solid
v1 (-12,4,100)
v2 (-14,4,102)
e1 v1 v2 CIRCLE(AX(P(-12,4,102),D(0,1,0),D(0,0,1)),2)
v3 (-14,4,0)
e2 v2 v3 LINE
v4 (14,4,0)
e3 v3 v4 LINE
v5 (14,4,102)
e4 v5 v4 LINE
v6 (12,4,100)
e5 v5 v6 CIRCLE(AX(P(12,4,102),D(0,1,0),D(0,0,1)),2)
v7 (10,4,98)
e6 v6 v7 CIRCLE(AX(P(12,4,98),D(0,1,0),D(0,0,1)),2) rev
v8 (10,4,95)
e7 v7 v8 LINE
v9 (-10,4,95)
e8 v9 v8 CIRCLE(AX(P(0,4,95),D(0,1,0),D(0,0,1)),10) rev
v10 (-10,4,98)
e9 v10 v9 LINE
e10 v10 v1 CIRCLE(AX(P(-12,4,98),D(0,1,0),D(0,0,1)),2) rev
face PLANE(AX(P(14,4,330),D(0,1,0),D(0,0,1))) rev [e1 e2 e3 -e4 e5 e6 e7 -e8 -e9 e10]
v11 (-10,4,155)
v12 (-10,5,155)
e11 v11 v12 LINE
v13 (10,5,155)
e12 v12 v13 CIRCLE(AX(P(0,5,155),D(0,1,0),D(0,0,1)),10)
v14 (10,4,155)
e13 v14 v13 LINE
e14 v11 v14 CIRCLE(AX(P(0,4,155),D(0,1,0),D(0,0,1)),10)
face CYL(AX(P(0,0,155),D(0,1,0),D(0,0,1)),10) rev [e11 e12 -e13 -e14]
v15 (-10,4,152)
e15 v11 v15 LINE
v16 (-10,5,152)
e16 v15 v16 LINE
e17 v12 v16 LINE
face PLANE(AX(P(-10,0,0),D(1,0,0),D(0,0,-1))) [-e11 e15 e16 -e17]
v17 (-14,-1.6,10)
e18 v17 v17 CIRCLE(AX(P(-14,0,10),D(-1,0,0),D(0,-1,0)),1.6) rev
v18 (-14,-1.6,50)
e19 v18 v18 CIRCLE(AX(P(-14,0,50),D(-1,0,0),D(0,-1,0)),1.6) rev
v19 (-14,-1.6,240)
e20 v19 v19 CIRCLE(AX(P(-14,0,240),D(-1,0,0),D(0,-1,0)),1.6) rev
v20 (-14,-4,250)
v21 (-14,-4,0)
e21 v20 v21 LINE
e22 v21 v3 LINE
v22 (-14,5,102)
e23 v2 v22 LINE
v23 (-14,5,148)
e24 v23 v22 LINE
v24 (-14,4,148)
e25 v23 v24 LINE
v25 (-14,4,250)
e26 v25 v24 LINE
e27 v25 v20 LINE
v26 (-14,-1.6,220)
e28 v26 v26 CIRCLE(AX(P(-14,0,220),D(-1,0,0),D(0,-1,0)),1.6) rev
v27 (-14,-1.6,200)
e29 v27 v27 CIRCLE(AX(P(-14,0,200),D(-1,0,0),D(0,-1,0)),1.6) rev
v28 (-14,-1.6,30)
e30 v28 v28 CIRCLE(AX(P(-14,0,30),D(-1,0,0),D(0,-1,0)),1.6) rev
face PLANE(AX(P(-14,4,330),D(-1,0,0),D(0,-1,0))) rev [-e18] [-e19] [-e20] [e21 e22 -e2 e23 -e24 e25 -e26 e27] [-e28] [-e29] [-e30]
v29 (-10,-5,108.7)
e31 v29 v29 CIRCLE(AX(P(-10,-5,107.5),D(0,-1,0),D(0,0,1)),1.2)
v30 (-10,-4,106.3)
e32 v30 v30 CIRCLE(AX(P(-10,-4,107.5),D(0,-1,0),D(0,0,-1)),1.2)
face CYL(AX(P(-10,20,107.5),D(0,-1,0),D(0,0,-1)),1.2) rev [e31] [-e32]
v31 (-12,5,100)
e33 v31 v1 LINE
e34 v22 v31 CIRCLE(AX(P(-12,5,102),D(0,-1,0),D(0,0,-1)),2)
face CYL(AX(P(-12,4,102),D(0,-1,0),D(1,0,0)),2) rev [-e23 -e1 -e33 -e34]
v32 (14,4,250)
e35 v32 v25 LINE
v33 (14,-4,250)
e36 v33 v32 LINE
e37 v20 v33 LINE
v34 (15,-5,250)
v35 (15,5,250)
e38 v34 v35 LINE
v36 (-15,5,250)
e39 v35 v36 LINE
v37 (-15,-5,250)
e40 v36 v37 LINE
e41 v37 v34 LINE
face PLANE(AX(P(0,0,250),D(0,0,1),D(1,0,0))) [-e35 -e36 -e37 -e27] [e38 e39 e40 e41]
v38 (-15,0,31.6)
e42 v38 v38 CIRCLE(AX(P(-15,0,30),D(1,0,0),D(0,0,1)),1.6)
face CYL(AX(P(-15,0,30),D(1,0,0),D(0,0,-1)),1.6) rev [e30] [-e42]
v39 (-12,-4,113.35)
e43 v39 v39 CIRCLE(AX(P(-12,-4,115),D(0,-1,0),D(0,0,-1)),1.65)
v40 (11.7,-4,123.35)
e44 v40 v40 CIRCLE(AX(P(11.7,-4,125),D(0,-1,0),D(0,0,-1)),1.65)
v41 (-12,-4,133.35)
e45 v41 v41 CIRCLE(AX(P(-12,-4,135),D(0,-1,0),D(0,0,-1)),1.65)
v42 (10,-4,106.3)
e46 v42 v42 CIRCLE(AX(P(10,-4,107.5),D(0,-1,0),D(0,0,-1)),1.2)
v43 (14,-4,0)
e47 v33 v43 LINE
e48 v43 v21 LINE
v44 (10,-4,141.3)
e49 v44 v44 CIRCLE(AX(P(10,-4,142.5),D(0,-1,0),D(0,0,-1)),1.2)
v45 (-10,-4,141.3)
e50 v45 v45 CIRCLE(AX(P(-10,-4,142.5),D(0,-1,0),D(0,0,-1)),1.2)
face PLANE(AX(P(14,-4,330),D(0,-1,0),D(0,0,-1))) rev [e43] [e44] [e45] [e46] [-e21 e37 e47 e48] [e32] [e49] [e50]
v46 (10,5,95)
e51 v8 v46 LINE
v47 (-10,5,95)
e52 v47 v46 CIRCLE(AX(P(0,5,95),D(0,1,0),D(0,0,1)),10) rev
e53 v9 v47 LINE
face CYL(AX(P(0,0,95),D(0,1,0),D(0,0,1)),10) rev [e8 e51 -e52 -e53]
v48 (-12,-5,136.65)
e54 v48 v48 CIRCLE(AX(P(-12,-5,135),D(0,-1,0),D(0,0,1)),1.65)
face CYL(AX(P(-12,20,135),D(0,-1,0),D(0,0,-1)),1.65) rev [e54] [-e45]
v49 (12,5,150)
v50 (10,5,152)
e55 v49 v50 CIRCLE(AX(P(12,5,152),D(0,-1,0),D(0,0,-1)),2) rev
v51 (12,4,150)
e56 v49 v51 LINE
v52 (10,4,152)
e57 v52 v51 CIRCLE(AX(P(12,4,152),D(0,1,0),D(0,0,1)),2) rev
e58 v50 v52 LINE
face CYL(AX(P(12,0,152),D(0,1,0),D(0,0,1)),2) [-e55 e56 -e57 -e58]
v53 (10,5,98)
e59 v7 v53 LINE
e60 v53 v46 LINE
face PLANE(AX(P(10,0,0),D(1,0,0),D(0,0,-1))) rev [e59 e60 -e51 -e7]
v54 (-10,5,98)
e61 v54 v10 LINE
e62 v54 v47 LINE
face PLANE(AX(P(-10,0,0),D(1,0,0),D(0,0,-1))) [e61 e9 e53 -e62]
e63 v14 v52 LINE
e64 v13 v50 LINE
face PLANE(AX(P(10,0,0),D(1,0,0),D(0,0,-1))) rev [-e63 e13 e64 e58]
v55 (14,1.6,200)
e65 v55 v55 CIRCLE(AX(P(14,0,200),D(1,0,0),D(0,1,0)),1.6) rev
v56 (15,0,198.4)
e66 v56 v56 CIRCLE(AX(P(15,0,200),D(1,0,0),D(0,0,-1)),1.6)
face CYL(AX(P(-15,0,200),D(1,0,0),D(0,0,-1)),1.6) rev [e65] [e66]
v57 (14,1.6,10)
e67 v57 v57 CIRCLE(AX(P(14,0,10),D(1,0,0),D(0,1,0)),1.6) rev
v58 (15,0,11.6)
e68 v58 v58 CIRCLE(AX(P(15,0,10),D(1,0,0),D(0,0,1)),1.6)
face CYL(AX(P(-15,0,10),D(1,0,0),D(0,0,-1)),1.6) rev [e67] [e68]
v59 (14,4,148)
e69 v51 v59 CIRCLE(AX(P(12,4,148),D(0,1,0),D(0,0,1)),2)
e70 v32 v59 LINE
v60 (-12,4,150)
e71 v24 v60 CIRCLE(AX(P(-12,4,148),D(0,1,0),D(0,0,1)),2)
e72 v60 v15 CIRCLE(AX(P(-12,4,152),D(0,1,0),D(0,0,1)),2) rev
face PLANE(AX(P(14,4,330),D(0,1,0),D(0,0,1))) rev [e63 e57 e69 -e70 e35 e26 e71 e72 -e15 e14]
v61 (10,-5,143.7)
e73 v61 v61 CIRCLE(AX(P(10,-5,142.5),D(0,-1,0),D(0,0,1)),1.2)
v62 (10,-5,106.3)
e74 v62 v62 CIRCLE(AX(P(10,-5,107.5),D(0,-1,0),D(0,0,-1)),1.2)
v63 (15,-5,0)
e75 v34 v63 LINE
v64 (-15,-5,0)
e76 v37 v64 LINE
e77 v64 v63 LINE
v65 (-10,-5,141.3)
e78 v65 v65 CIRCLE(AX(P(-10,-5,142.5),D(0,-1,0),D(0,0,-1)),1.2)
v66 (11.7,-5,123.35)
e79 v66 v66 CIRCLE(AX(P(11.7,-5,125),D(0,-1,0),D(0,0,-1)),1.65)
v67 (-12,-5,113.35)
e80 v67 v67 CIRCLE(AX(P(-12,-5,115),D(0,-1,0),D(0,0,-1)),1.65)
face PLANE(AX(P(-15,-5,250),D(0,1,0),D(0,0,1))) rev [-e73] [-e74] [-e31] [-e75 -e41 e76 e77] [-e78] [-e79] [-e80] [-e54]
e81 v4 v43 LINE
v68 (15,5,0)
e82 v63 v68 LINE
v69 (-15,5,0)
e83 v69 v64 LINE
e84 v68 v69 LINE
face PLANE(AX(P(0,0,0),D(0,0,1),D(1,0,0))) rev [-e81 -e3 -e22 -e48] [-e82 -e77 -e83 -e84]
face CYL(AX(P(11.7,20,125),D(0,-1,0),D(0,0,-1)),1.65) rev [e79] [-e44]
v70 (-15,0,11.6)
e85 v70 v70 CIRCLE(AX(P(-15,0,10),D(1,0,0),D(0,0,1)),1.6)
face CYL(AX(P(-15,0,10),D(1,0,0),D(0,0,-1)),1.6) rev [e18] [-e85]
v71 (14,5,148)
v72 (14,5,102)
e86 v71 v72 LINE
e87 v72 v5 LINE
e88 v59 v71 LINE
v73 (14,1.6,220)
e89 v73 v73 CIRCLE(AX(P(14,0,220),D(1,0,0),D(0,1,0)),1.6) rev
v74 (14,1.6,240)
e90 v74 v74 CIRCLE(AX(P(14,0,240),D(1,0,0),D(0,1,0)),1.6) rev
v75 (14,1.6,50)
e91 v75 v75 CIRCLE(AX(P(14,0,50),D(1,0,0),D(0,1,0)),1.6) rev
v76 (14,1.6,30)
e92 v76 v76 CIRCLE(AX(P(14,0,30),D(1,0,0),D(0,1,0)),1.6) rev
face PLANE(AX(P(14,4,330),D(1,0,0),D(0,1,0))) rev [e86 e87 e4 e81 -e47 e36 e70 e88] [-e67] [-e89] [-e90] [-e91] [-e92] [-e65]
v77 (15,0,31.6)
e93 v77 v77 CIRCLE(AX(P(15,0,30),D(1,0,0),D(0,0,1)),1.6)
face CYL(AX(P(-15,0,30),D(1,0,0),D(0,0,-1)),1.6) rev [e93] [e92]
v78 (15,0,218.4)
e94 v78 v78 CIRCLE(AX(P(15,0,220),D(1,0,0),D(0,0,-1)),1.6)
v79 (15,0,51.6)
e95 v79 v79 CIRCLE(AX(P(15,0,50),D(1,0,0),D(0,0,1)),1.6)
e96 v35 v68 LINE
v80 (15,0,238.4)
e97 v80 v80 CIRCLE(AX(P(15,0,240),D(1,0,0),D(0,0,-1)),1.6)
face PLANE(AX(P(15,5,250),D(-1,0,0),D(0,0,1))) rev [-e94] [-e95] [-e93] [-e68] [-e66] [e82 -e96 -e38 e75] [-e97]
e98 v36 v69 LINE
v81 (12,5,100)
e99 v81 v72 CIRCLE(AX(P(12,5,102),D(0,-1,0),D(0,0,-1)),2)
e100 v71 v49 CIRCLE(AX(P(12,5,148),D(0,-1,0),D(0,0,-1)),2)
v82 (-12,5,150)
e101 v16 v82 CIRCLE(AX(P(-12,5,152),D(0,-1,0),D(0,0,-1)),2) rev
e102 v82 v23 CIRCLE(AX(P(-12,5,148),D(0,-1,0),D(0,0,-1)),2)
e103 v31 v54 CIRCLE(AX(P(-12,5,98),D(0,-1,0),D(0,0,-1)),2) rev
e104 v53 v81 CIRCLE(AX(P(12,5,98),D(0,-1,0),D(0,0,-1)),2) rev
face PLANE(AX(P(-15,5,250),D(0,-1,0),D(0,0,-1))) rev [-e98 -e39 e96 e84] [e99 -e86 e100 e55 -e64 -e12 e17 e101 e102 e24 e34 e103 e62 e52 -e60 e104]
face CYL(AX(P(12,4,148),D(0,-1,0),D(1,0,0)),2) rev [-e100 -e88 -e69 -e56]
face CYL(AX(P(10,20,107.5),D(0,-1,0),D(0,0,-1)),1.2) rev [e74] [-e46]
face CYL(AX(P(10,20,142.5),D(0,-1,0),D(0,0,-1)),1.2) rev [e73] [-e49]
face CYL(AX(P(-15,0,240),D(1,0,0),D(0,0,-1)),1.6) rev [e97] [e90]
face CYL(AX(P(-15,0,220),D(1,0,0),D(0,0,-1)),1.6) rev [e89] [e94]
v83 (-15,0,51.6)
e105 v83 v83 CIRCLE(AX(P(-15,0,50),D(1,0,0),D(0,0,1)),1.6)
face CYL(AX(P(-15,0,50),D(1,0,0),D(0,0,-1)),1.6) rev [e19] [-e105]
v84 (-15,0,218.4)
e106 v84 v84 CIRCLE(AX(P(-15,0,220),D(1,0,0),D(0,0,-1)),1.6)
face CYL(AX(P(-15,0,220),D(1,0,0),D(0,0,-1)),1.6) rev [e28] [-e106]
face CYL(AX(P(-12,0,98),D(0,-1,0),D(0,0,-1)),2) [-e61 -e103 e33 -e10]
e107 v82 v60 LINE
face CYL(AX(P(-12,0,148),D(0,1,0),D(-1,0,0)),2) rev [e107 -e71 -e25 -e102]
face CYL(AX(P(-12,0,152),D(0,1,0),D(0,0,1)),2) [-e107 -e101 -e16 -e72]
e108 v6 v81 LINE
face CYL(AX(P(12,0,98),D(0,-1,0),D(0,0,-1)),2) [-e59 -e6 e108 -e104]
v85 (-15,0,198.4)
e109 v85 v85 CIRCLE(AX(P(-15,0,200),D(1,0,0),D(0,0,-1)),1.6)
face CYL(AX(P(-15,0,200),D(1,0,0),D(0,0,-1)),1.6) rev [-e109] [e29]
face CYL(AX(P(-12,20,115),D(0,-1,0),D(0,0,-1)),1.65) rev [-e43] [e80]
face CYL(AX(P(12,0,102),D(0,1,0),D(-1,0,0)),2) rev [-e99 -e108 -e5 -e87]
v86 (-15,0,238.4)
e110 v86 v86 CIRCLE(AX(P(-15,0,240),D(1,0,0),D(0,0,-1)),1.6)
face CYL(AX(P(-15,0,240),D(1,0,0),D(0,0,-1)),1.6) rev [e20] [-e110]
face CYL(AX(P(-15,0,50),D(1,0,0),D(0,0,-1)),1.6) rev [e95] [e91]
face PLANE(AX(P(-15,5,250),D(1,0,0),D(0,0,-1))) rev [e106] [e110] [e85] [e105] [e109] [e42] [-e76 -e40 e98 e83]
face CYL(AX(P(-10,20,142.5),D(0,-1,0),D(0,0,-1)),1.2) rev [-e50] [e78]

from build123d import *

# Parameters (mm, degrees)
SKETCH_1_W          = 30
SKETCH_1_H          = 10
SKETCH_1_W_2        = 27
SKETCH_1_H_2        = 7
EXTRUDE_1_DEPTH     = 250
SKETCH_2_R          = 1.6
CUT_EXTRUDE_1_DEPTH = 252.843205189
SKETCH_6_W          = 28
SKETCH_6_H          = 8
CUT_EXTRUDE_5_DEPTH = 330
SKETCH_8_W          = 4
SKETCH_8_H          = 25
CUT_EXTRUDE_6_DEPTH = 5
SKETCH_10_R         = 1.65
SKETCH_10_W         = 40
SKETCH_10_H         = 39.7
CUT_EXTRUDE_7_DEPTH = 25
FILLET_1_R          = 2
SKETCH_11_R         = 1.2
CUT_EXTRUDE_8_DEPTH = 25


with BuildPart() as part:
    # 草图1 → 凸台-拉伸1 (new body)
    with BuildSketch(Plane.XY):
        Rectangle(SKETCH_1_W, SKETCH_1_H)
        Rectangle(SKETCH_1_W_2, SKETCH_1_H_2, mode=Mode.SUBTRACT)
    extrude(amount=EXTRUDE_1_DEPTH)

    # 草图2 → 切除-拉伸1 (cut, through all)
    with BuildSketch(Plane(origin=(15, 0, 0), x_dir=(0, 0, -1), z_dir=(1, 0, 0))):
        with Locations((-240, 0)):
            Circle(SKETCH_2_R)
        with Locations((-220, 0)):
            Circle(SKETCH_2_R)
        with Locations((-200, 0)):
            Circle(SKETCH_2_R)
        with Locations((-50, 0)):
            Circle(SKETCH_2_R)
        with Locations((-30, 0)):
            Circle(SKETCH_2_R)
        with Locations((-10, 0)):
            Circle(SKETCH_2_R)
    extrude(amount=-CUT_EXTRUDE_1_DEPTH, mode=Mode.SUBTRACT)

    # 草图6 → 切除-拉伸5 (cut)
    with BuildSketch(Plane(origin=(0, 0, 0), x_dir=(-1, 0, 0), z_dir=(0, 0, -1))):
        Rectangle(SKETCH_6_W, SKETCH_6_H)
    extrude(amount=-CUT_EXTRUDE_5_DEPTH, mode=Mode.SUBTRACT)

    # 草图8 → 切除-拉伸6 (cut)
    with BuildSketch(Plane(origin=(0, 5, 0), x_dir=(1, 0, 0), z_dir=(0, 1, 0))):
        with BuildLine():
            Line((-10, -150), (-10, -155))
            ThreePointArc((-10, -155), (-7.071067812, -162.071067812), (0, -165))
            Line((0, -165), (0, -85))
            ThreePointArc((0, -85), (-7.071067812, -87.928932188), (-10, -95))
            Line((-10, -95), (-10, -100))
            Line((-10, -100), (-10, -125))
            Line((-10, -125), (-10, -150))
        make_face()
        with BuildLine():
            Line((0, -85), (0, -165))
            ThreePointArc((0, -165), (7.071067812, -162.071067812), (10, -155))
            Line((10, -155), (10, -150))
            Line((10, -150), (10, -125))
            Line((10, -125), (10, -100))
            Line((10, -100), (10, -95))
            ThreePointArc((10, -95), (7.071067812, -87.928932188), (0, -85))
        make_face()
        with Locations((12, -112.5)):
            Rectangle(SKETCH_8_W, SKETCH_8_H)
        with Locations((12, -137.5)):
            Rectangle(SKETCH_8_W, SKETCH_8_H)
        with Locations((-12, -112.5)):
            Rectangle(SKETCH_8_W, SKETCH_8_H)
        with Locations((-12, -137.5)):
            Rectangle(SKETCH_8_W, SKETCH_8_H)
    extrude(amount=-CUT_EXTRUDE_6_DEPTH, mode=Mode.SUBTRACT)

    # 草图10 → 切除-拉伸7 (cut)
    # profile 1 of 4: a face of its own
    with BuildSketch(Plane.XZ.offset(5)):
        with Locations(Location((-12, 115, 0), (0, 0, 270))):
            Circle(SKETCH_10_R)
    # profile 2 of 4: a face of its own
    with BuildSketch(Plane.XZ.offset(5)):
        with Locations(Location((-12, 135, 0), (0, 0, 270))):
            Circle(SKETCH_10_R)
    # profile 3 of 4: a face of its own
    with BuildSketch(Plane.XZ.offset(5)):
        with Locations(Location((11.7, 125, 0), (0, 0, 270))):
            Circle(SKETCH_10_R)
    # profile 4 of 4: a face of its own
    with BuildSketch(Plane.XZ.offset(5)):
        with Locations((-84.485896168, 54.669789624)):
            Rectangle(SKETCH_10_W, SKETCH_10_H)
        with Locations((-84.485896168, 42.819789624)):
            Circle(SKETCH_10_R, mode=Mode.SUBTRACT)
        with Locations((-94.485896168, 66.519789624)):
            Circle(SKETCH_10_R, mode=Mode.SUBTRACT)
        with Locations((-74.485896168, 66.519789624)):
            Circle(SKETCH_10_R, mode=Mode.SUBTRACT)
    extrude(amount=-CUT_EXTRUDE_7_DEPTH, mode=Mode.SUBTRACT)

    # 圆角1
    fillet_1_edges = [part.edges().sort_by_distance(p)[0] for p in [
        (-14, 4.5, 150),
        (14, 4.5, 150),
        (14, 4.5, 100),
        (-14, 4.5, 100),
    ]]
    fillet(fillet_1_edges, radius=FILLET_1_R)
    fillet_1_2_edges = [part.edges().sort_by_distance(p)[0] for p in [
        (10, 4.5, 100),
        (-10, 4.5, 100),
        (-10, 4.5, 150),
        (10, 4.5, 150),
    ]]
    fillet(fillet_1_2_edges, radius=FILLET_1_R - 0.0001)  # a hair under: the kernel refuses the full size

    # 草图11 → 切除-拉伸8 (cut)
    with BuildSketch(Plane.XZ.offset(5)):
        with Locations(Location((-10, 142.5, 0), (0, 0, 270))):
            Circle(SKETCH_11_R)
        with Locations(Location((10, 142.5, 0), (0, 0, 270))):
            Circle(SKETCH_11_R)
        with Locations(Location((10, 107.5, 0), (0, 0, 270))):
            Circle(SKETCH_11_R)
        with Locations(Location((-10, 107.5, 0), (0, 0, 270))):
            Circle(SKETCH_11_R)
    extrude(amount=-CUT_EXTRUDE_8_DEPTH, mode=Mode.SUBTRACT)


solid = part.part
